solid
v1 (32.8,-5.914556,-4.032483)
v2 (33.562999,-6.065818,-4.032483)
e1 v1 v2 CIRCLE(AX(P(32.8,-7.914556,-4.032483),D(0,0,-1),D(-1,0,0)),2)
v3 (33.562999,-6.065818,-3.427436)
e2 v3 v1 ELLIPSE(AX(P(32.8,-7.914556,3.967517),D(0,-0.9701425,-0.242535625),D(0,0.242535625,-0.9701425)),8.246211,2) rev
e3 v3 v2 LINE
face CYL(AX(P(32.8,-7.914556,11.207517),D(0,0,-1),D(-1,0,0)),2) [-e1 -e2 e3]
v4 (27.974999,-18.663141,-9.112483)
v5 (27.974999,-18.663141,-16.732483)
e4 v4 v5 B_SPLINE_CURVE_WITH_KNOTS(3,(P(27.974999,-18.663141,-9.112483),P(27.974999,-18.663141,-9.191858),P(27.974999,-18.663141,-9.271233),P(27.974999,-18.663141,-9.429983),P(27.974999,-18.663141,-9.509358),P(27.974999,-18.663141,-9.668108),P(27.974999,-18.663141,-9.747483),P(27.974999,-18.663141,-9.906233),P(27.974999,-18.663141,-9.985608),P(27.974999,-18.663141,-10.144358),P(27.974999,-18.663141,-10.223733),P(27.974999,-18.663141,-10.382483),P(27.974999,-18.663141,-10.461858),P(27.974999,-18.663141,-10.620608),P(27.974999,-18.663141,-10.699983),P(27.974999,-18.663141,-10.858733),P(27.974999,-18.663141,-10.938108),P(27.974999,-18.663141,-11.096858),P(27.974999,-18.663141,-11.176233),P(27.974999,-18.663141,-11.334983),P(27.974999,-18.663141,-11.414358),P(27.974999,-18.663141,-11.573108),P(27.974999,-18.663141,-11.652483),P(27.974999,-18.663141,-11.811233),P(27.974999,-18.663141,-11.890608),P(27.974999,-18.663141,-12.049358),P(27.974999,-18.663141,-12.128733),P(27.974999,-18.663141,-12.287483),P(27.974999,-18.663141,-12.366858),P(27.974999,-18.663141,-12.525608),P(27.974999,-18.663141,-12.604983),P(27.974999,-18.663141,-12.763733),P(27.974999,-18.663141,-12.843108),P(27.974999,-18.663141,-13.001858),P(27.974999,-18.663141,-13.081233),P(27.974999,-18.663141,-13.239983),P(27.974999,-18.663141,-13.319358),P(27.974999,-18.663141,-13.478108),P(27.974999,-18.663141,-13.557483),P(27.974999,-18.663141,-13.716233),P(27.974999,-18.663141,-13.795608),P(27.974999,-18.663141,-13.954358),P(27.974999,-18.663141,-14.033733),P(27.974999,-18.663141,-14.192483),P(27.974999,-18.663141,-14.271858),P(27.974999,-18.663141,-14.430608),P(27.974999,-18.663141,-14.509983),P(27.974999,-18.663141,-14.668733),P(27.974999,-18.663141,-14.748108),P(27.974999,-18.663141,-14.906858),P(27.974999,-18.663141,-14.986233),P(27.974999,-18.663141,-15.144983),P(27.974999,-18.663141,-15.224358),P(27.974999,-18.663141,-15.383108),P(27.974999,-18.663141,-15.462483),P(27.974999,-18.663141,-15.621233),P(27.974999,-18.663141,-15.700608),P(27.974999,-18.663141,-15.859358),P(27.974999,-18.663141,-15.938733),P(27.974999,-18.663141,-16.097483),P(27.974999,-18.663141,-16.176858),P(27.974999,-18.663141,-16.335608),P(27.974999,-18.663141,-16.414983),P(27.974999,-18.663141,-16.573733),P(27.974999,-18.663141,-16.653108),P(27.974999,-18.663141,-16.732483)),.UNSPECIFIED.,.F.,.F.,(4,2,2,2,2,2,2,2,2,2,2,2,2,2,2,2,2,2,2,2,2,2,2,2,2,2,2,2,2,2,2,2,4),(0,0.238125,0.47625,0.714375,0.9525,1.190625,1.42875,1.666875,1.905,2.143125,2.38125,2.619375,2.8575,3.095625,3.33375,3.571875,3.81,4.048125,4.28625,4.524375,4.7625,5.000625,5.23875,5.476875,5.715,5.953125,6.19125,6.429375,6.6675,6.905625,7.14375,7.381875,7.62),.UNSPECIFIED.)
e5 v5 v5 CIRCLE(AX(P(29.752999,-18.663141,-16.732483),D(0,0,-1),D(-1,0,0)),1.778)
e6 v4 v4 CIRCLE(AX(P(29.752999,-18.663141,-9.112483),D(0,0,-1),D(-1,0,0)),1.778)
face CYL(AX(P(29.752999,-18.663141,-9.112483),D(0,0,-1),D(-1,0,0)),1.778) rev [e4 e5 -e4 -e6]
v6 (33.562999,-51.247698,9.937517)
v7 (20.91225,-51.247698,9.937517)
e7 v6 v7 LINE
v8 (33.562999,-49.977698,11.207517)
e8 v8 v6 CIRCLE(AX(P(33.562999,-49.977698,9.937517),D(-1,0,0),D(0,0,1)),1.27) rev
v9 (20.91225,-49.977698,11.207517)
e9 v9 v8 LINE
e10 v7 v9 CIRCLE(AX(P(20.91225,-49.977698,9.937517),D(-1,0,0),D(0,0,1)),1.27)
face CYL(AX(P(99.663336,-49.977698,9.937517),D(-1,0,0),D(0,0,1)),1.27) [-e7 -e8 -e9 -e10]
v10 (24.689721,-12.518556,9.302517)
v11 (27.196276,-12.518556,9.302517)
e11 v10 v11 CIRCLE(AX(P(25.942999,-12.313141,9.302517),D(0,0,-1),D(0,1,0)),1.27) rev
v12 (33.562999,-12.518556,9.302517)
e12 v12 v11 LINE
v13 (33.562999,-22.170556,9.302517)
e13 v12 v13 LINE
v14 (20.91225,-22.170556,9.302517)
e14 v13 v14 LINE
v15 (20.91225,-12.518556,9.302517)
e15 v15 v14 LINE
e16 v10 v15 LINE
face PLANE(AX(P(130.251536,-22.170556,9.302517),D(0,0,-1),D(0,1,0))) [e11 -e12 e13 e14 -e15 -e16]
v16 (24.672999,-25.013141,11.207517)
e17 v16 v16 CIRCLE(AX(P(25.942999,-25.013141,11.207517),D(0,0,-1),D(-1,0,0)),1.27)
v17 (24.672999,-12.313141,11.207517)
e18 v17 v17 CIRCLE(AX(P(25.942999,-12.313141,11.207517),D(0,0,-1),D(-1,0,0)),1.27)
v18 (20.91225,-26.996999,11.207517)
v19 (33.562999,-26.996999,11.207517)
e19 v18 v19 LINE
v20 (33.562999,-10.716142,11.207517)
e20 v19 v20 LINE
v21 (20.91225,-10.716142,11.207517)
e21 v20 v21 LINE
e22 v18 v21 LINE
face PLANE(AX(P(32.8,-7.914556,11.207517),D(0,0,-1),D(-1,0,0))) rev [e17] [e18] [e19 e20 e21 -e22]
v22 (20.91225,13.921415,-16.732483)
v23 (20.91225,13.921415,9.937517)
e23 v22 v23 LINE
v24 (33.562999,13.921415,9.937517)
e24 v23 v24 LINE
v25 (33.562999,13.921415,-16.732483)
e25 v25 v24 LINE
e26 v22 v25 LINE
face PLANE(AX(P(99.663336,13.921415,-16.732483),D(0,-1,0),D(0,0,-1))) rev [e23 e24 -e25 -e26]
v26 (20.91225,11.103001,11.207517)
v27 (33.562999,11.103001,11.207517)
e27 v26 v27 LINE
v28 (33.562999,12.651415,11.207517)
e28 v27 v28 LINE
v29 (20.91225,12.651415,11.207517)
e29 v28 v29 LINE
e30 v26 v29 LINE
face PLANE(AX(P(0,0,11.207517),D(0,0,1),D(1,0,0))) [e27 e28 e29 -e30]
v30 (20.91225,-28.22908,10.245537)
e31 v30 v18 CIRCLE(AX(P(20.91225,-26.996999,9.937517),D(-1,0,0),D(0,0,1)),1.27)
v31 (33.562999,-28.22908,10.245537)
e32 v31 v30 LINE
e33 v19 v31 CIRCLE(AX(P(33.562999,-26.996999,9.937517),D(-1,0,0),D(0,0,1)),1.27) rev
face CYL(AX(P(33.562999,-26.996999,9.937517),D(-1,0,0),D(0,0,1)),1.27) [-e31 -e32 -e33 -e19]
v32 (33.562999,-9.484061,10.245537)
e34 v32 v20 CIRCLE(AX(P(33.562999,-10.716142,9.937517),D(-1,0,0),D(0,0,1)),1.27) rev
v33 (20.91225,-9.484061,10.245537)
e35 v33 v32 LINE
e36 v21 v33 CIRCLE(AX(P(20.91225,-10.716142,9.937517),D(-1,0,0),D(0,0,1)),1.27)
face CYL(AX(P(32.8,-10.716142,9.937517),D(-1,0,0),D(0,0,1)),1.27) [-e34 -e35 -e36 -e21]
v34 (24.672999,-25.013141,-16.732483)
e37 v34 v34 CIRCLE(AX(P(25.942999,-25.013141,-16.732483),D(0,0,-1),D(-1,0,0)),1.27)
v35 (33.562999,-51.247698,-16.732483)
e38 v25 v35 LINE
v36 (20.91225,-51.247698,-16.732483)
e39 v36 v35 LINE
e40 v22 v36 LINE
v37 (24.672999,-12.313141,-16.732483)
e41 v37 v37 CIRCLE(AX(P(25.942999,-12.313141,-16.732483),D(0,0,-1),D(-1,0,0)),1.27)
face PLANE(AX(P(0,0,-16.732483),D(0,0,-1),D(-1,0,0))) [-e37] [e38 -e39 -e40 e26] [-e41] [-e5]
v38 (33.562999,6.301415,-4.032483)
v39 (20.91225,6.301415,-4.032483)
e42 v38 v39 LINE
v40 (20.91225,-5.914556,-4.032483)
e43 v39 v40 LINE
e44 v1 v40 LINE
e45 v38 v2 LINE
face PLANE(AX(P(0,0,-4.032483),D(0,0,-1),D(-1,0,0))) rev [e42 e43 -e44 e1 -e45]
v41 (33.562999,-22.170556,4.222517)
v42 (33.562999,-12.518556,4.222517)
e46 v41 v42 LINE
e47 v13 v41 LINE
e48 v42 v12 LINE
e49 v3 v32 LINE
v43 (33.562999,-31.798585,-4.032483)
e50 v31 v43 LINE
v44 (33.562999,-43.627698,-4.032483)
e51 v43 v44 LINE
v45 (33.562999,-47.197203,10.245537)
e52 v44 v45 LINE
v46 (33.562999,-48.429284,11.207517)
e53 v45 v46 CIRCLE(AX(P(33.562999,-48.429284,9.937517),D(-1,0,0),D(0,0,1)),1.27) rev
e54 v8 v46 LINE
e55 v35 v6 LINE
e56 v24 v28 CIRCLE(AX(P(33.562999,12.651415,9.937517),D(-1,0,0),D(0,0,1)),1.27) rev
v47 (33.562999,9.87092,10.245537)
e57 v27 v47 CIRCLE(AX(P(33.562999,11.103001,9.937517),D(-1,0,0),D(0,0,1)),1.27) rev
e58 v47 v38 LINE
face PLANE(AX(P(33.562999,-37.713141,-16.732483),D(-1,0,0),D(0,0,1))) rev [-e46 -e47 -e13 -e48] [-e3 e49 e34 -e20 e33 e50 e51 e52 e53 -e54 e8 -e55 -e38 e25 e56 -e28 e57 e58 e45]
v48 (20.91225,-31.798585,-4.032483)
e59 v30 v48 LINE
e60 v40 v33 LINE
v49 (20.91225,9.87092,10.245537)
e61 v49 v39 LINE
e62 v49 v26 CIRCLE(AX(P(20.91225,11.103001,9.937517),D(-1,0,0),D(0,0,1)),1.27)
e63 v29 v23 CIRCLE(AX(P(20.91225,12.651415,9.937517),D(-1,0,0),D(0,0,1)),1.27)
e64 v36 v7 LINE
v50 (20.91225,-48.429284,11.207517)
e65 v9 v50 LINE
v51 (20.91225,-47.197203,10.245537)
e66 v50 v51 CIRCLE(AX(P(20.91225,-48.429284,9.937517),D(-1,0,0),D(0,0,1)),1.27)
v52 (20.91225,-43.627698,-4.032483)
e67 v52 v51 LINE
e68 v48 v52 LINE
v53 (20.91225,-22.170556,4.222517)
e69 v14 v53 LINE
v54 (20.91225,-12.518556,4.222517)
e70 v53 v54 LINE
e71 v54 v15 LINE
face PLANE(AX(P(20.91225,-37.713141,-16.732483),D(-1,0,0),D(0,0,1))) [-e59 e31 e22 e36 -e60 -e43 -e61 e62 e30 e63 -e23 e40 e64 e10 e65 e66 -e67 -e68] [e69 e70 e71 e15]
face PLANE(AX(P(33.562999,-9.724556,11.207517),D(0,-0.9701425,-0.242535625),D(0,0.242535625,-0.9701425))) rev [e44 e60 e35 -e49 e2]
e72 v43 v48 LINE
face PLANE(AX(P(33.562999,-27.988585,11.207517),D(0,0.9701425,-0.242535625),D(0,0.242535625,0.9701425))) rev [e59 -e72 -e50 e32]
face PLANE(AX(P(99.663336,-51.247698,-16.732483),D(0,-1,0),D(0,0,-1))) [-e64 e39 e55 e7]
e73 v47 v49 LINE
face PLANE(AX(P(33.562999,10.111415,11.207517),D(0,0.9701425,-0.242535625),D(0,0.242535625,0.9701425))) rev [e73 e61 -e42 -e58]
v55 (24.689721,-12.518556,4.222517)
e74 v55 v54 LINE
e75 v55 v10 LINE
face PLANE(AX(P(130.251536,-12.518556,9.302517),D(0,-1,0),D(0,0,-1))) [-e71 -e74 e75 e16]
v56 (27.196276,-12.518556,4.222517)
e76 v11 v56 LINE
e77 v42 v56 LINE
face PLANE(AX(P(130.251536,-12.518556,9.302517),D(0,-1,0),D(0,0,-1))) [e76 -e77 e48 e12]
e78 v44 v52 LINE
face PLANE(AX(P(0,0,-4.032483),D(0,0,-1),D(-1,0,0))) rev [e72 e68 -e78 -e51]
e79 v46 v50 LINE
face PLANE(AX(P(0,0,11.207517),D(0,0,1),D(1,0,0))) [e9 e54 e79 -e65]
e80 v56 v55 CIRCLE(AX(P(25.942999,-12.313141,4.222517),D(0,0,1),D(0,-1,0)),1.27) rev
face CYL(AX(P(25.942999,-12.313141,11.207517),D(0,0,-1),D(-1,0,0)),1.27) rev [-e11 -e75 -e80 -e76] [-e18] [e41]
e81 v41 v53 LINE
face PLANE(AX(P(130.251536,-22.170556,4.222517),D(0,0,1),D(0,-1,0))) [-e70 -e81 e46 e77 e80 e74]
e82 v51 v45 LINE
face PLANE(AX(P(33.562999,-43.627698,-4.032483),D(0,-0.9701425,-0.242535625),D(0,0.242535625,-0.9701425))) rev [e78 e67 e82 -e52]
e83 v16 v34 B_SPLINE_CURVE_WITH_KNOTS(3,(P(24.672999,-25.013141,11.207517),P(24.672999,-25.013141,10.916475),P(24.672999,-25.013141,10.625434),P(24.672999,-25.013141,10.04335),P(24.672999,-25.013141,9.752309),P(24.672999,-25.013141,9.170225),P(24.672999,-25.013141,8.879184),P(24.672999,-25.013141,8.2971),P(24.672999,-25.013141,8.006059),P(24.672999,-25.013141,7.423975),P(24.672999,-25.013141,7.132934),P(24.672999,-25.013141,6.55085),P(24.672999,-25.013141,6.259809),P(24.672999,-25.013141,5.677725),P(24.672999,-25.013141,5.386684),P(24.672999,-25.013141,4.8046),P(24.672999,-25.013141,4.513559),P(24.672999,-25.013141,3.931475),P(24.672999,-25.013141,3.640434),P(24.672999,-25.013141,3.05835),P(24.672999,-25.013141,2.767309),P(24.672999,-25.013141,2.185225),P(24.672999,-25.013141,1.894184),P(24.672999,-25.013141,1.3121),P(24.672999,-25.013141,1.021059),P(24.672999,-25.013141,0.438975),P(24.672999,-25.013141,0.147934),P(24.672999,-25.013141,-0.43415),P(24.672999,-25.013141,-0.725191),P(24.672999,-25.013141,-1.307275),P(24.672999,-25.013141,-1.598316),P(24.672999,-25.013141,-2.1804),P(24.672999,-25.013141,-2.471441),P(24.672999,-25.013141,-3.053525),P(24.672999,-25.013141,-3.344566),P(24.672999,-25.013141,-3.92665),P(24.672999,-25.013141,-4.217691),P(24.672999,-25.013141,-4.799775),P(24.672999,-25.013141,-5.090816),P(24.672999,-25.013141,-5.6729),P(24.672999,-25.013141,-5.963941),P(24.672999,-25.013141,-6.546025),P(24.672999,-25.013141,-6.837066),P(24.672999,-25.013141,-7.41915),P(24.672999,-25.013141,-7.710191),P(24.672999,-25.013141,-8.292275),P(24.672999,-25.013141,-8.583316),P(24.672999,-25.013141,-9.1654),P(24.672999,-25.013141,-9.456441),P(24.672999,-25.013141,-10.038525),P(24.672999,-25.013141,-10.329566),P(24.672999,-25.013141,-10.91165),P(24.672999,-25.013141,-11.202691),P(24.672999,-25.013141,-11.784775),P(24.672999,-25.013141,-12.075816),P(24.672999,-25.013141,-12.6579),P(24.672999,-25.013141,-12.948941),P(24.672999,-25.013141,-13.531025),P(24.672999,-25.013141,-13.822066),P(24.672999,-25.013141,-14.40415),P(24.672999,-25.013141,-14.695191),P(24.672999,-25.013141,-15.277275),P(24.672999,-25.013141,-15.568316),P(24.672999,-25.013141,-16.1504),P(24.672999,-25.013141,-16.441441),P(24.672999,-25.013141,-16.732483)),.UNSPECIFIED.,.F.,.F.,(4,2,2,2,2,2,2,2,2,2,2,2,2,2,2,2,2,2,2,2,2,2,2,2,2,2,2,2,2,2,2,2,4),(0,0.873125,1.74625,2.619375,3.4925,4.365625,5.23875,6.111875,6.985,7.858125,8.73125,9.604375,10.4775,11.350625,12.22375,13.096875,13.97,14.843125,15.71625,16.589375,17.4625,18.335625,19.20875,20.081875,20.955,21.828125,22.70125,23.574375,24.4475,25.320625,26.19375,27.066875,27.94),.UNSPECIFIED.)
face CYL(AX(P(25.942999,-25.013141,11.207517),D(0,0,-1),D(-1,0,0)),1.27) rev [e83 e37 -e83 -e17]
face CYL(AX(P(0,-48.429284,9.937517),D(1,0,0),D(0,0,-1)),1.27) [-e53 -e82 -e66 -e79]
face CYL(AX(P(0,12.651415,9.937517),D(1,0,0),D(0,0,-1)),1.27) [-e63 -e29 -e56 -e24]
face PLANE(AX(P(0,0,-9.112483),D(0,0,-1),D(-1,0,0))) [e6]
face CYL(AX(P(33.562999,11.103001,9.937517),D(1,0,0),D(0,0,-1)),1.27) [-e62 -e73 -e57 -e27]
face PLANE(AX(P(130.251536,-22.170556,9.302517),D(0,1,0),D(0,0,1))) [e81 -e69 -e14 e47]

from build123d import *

# Parameters (mm, degrees)
BOSS_EXTRUDE1_START     = -4.032483
SKETCH2_W               = 12.650748945
SKETCH2_H               = 65.169112304
BOSS_EXTRUDE1_DEPTH     = 12.7
BOSS_EXTRUDE3_START     = -4.032483117
BOSS_EXTRUDE3_OUTLINE_W = 12.650748945
BOSS_EXTRUDE3_OUTLINE_H = 7.62
BOSS_EXTRUDE3_DEPTH     = 15.24
SKETCH3_R               = 1.778
CUT_EXTRUDE1_DEPTH      = 7.62
SKETCH3_3_R             = 1.27
CUT_EXTRUDE2_DEPTH      = 68.330862042
CUT_EXTRUDE6_DEPTH      = 56.374578465
FILLET1_R               = 1.27
CAVITY1_START           = -22.170556152
CAVITY1_OUTLINE_W       = 12.650748945
CAVITY1_OUTLINE_H       = 5.08
CAVITY1_DEPTH           = 9.652


# Read off the part's stored shape, not the designer's step: Boss-Extrude3, Cavity1
with BuildPart() as part:
    # Sketch2 → Boss-Extrude1 (new body)
    with BuildSketch(Plane.XY.offset(BOSS_EXTRUDE1_START)):
        with Locations((27.23762425, -18.663141358)):
            Rectangle(SKETCH2_W, SKETCH2_H)
    extrude(amount=-BOSS_EXTRUDE1_DEPTH)

    # Boss-Extrude3 outline → Boss-Extrude3 (add)
    with BuildSketch(Plane.XY.offset(BOSS_EXTRUDE3_START)):
        with Locations((27.23762425, 10.111414794)):
            Rectangle(BOSS_EXTRUDE3_OUTLINE_W, BOSS_EXTRUDE3_OUTLINE_H)
        with BuildLine():
            Line((32.8, -5.914556152), (20.912249778, -5.914556152))
            Line((20.912249778, -5.914556152), (20.912249778, -31.798585206))
            Line((20.912249778, -31.798585206), (33.562998723, -31.798585206))
            Line((33.562998723, -31.798585206), (33.562998723, -6.065817947))
            ThreePointArc((33.562998723, -6.065817947), (33.188923894, -5.952736026), (32.8, -5.914556152))
        make_face()
        with Locations((27.23762425, -47.43769751)):
            Rectangle(BOSS_EXTRUDE3_OUTLINE_W, BOSS_EXTRUDE3_OUTLINE_H)
    extrude(amount=BOSS_EXTRUDE3_DEPTH)

    # Sketch3 → Cut-Extrude1 (cut)
    with BuildSketch(Plane(origin=(0, 0, -16.732483117), x_dir=(-1, 0, 0), z_dir=(0, 0, -1))):
        with Locations((-29.752998723, -18.663141358)):
            Circle(SKETCH3_R)
    extrude(amount=-CUT_EXTRUDE1_DEPTH, mode=Mode.SUBTRACT)

    # Sketch3<3> → Cut-Extrude2 (cut, through all)
    with BuildSketch(Plane(origin=(0, 0, -16.732483117), x_dir=(-1, 0, 0), z_dir=(0, 0, -1))):
        with Locations((-25.942998723, -12.313141358)):
            Circle(SKETCH3_3_R)
        with Locations((-25.942998723, -25.013141358)):
            Circle(SKETCH3_3_R)
    extrude(amount=-CUT_EXTRUDE2_DEPTH, mode=Mode.SUBTRACT)

    # Sketch7 → Cut-Extrude6 (cut, through all)
    with BuildSketch(Plane.ZY.offset(-20.912249778)):
        Polygon((11.207516883, 6.301414794), (11.207516883, 10.111414794), (-4.032483117, 6.301414794), align=None)
        Polygon((-4.032483117, -5.914556152), (11.207516883, -5.914556152), (11.207516883, -9.724556152), align=None)
        Polygon((-4.032483117, -43.62769751), (11.207516883, -47.43769751), (11.207516883, -43.62769751), align=None)
        Polygon((11.207516883, -31.798585206), (11.207516883, -27.988585206), (-4.032483117, -31.798585206), align=None)
    extrude(amount=-CUT_EXTRUDE6_DEPTH, mode=Mode.SUBTRACT)

    # Fillet1
    fillet1_edges = [part.edges().sort_by_distance(p)[0] for p in [
        (27.237624251, -9.724556152, 11.207516883),
        (27.23762425, -51.24769751, 11.207516883),
        (27.23762425, 13.921414794, 11.207516883),
        (27.237624251, 10.111414794, 11.207516883),
        (27.237624251, -27.988585206, 11.207516883),
        (27.237624251, -47.43769751, 11.207516883),
    ]]
    fillet(fillet1_edges, radius=FILLET1_R)

    # Cavity1 outline → Cavity1 (cut)
    with BuildSketch(Plane(origin=(0, 0, 0), x_dir=(1, 0, 0), z_dir=(0, 1, 0)).offset(CAVITY1_START)):
        with Locations((27.23762425, -6.762516883)):
            Rectangle(CAVITY1_OUTLINE_W, CAVITY1_OUTLINE_H)
    extrude(amount=CAVITY1_DEPTH, mode=Mode.SUBTRACT)


solid = part.part
